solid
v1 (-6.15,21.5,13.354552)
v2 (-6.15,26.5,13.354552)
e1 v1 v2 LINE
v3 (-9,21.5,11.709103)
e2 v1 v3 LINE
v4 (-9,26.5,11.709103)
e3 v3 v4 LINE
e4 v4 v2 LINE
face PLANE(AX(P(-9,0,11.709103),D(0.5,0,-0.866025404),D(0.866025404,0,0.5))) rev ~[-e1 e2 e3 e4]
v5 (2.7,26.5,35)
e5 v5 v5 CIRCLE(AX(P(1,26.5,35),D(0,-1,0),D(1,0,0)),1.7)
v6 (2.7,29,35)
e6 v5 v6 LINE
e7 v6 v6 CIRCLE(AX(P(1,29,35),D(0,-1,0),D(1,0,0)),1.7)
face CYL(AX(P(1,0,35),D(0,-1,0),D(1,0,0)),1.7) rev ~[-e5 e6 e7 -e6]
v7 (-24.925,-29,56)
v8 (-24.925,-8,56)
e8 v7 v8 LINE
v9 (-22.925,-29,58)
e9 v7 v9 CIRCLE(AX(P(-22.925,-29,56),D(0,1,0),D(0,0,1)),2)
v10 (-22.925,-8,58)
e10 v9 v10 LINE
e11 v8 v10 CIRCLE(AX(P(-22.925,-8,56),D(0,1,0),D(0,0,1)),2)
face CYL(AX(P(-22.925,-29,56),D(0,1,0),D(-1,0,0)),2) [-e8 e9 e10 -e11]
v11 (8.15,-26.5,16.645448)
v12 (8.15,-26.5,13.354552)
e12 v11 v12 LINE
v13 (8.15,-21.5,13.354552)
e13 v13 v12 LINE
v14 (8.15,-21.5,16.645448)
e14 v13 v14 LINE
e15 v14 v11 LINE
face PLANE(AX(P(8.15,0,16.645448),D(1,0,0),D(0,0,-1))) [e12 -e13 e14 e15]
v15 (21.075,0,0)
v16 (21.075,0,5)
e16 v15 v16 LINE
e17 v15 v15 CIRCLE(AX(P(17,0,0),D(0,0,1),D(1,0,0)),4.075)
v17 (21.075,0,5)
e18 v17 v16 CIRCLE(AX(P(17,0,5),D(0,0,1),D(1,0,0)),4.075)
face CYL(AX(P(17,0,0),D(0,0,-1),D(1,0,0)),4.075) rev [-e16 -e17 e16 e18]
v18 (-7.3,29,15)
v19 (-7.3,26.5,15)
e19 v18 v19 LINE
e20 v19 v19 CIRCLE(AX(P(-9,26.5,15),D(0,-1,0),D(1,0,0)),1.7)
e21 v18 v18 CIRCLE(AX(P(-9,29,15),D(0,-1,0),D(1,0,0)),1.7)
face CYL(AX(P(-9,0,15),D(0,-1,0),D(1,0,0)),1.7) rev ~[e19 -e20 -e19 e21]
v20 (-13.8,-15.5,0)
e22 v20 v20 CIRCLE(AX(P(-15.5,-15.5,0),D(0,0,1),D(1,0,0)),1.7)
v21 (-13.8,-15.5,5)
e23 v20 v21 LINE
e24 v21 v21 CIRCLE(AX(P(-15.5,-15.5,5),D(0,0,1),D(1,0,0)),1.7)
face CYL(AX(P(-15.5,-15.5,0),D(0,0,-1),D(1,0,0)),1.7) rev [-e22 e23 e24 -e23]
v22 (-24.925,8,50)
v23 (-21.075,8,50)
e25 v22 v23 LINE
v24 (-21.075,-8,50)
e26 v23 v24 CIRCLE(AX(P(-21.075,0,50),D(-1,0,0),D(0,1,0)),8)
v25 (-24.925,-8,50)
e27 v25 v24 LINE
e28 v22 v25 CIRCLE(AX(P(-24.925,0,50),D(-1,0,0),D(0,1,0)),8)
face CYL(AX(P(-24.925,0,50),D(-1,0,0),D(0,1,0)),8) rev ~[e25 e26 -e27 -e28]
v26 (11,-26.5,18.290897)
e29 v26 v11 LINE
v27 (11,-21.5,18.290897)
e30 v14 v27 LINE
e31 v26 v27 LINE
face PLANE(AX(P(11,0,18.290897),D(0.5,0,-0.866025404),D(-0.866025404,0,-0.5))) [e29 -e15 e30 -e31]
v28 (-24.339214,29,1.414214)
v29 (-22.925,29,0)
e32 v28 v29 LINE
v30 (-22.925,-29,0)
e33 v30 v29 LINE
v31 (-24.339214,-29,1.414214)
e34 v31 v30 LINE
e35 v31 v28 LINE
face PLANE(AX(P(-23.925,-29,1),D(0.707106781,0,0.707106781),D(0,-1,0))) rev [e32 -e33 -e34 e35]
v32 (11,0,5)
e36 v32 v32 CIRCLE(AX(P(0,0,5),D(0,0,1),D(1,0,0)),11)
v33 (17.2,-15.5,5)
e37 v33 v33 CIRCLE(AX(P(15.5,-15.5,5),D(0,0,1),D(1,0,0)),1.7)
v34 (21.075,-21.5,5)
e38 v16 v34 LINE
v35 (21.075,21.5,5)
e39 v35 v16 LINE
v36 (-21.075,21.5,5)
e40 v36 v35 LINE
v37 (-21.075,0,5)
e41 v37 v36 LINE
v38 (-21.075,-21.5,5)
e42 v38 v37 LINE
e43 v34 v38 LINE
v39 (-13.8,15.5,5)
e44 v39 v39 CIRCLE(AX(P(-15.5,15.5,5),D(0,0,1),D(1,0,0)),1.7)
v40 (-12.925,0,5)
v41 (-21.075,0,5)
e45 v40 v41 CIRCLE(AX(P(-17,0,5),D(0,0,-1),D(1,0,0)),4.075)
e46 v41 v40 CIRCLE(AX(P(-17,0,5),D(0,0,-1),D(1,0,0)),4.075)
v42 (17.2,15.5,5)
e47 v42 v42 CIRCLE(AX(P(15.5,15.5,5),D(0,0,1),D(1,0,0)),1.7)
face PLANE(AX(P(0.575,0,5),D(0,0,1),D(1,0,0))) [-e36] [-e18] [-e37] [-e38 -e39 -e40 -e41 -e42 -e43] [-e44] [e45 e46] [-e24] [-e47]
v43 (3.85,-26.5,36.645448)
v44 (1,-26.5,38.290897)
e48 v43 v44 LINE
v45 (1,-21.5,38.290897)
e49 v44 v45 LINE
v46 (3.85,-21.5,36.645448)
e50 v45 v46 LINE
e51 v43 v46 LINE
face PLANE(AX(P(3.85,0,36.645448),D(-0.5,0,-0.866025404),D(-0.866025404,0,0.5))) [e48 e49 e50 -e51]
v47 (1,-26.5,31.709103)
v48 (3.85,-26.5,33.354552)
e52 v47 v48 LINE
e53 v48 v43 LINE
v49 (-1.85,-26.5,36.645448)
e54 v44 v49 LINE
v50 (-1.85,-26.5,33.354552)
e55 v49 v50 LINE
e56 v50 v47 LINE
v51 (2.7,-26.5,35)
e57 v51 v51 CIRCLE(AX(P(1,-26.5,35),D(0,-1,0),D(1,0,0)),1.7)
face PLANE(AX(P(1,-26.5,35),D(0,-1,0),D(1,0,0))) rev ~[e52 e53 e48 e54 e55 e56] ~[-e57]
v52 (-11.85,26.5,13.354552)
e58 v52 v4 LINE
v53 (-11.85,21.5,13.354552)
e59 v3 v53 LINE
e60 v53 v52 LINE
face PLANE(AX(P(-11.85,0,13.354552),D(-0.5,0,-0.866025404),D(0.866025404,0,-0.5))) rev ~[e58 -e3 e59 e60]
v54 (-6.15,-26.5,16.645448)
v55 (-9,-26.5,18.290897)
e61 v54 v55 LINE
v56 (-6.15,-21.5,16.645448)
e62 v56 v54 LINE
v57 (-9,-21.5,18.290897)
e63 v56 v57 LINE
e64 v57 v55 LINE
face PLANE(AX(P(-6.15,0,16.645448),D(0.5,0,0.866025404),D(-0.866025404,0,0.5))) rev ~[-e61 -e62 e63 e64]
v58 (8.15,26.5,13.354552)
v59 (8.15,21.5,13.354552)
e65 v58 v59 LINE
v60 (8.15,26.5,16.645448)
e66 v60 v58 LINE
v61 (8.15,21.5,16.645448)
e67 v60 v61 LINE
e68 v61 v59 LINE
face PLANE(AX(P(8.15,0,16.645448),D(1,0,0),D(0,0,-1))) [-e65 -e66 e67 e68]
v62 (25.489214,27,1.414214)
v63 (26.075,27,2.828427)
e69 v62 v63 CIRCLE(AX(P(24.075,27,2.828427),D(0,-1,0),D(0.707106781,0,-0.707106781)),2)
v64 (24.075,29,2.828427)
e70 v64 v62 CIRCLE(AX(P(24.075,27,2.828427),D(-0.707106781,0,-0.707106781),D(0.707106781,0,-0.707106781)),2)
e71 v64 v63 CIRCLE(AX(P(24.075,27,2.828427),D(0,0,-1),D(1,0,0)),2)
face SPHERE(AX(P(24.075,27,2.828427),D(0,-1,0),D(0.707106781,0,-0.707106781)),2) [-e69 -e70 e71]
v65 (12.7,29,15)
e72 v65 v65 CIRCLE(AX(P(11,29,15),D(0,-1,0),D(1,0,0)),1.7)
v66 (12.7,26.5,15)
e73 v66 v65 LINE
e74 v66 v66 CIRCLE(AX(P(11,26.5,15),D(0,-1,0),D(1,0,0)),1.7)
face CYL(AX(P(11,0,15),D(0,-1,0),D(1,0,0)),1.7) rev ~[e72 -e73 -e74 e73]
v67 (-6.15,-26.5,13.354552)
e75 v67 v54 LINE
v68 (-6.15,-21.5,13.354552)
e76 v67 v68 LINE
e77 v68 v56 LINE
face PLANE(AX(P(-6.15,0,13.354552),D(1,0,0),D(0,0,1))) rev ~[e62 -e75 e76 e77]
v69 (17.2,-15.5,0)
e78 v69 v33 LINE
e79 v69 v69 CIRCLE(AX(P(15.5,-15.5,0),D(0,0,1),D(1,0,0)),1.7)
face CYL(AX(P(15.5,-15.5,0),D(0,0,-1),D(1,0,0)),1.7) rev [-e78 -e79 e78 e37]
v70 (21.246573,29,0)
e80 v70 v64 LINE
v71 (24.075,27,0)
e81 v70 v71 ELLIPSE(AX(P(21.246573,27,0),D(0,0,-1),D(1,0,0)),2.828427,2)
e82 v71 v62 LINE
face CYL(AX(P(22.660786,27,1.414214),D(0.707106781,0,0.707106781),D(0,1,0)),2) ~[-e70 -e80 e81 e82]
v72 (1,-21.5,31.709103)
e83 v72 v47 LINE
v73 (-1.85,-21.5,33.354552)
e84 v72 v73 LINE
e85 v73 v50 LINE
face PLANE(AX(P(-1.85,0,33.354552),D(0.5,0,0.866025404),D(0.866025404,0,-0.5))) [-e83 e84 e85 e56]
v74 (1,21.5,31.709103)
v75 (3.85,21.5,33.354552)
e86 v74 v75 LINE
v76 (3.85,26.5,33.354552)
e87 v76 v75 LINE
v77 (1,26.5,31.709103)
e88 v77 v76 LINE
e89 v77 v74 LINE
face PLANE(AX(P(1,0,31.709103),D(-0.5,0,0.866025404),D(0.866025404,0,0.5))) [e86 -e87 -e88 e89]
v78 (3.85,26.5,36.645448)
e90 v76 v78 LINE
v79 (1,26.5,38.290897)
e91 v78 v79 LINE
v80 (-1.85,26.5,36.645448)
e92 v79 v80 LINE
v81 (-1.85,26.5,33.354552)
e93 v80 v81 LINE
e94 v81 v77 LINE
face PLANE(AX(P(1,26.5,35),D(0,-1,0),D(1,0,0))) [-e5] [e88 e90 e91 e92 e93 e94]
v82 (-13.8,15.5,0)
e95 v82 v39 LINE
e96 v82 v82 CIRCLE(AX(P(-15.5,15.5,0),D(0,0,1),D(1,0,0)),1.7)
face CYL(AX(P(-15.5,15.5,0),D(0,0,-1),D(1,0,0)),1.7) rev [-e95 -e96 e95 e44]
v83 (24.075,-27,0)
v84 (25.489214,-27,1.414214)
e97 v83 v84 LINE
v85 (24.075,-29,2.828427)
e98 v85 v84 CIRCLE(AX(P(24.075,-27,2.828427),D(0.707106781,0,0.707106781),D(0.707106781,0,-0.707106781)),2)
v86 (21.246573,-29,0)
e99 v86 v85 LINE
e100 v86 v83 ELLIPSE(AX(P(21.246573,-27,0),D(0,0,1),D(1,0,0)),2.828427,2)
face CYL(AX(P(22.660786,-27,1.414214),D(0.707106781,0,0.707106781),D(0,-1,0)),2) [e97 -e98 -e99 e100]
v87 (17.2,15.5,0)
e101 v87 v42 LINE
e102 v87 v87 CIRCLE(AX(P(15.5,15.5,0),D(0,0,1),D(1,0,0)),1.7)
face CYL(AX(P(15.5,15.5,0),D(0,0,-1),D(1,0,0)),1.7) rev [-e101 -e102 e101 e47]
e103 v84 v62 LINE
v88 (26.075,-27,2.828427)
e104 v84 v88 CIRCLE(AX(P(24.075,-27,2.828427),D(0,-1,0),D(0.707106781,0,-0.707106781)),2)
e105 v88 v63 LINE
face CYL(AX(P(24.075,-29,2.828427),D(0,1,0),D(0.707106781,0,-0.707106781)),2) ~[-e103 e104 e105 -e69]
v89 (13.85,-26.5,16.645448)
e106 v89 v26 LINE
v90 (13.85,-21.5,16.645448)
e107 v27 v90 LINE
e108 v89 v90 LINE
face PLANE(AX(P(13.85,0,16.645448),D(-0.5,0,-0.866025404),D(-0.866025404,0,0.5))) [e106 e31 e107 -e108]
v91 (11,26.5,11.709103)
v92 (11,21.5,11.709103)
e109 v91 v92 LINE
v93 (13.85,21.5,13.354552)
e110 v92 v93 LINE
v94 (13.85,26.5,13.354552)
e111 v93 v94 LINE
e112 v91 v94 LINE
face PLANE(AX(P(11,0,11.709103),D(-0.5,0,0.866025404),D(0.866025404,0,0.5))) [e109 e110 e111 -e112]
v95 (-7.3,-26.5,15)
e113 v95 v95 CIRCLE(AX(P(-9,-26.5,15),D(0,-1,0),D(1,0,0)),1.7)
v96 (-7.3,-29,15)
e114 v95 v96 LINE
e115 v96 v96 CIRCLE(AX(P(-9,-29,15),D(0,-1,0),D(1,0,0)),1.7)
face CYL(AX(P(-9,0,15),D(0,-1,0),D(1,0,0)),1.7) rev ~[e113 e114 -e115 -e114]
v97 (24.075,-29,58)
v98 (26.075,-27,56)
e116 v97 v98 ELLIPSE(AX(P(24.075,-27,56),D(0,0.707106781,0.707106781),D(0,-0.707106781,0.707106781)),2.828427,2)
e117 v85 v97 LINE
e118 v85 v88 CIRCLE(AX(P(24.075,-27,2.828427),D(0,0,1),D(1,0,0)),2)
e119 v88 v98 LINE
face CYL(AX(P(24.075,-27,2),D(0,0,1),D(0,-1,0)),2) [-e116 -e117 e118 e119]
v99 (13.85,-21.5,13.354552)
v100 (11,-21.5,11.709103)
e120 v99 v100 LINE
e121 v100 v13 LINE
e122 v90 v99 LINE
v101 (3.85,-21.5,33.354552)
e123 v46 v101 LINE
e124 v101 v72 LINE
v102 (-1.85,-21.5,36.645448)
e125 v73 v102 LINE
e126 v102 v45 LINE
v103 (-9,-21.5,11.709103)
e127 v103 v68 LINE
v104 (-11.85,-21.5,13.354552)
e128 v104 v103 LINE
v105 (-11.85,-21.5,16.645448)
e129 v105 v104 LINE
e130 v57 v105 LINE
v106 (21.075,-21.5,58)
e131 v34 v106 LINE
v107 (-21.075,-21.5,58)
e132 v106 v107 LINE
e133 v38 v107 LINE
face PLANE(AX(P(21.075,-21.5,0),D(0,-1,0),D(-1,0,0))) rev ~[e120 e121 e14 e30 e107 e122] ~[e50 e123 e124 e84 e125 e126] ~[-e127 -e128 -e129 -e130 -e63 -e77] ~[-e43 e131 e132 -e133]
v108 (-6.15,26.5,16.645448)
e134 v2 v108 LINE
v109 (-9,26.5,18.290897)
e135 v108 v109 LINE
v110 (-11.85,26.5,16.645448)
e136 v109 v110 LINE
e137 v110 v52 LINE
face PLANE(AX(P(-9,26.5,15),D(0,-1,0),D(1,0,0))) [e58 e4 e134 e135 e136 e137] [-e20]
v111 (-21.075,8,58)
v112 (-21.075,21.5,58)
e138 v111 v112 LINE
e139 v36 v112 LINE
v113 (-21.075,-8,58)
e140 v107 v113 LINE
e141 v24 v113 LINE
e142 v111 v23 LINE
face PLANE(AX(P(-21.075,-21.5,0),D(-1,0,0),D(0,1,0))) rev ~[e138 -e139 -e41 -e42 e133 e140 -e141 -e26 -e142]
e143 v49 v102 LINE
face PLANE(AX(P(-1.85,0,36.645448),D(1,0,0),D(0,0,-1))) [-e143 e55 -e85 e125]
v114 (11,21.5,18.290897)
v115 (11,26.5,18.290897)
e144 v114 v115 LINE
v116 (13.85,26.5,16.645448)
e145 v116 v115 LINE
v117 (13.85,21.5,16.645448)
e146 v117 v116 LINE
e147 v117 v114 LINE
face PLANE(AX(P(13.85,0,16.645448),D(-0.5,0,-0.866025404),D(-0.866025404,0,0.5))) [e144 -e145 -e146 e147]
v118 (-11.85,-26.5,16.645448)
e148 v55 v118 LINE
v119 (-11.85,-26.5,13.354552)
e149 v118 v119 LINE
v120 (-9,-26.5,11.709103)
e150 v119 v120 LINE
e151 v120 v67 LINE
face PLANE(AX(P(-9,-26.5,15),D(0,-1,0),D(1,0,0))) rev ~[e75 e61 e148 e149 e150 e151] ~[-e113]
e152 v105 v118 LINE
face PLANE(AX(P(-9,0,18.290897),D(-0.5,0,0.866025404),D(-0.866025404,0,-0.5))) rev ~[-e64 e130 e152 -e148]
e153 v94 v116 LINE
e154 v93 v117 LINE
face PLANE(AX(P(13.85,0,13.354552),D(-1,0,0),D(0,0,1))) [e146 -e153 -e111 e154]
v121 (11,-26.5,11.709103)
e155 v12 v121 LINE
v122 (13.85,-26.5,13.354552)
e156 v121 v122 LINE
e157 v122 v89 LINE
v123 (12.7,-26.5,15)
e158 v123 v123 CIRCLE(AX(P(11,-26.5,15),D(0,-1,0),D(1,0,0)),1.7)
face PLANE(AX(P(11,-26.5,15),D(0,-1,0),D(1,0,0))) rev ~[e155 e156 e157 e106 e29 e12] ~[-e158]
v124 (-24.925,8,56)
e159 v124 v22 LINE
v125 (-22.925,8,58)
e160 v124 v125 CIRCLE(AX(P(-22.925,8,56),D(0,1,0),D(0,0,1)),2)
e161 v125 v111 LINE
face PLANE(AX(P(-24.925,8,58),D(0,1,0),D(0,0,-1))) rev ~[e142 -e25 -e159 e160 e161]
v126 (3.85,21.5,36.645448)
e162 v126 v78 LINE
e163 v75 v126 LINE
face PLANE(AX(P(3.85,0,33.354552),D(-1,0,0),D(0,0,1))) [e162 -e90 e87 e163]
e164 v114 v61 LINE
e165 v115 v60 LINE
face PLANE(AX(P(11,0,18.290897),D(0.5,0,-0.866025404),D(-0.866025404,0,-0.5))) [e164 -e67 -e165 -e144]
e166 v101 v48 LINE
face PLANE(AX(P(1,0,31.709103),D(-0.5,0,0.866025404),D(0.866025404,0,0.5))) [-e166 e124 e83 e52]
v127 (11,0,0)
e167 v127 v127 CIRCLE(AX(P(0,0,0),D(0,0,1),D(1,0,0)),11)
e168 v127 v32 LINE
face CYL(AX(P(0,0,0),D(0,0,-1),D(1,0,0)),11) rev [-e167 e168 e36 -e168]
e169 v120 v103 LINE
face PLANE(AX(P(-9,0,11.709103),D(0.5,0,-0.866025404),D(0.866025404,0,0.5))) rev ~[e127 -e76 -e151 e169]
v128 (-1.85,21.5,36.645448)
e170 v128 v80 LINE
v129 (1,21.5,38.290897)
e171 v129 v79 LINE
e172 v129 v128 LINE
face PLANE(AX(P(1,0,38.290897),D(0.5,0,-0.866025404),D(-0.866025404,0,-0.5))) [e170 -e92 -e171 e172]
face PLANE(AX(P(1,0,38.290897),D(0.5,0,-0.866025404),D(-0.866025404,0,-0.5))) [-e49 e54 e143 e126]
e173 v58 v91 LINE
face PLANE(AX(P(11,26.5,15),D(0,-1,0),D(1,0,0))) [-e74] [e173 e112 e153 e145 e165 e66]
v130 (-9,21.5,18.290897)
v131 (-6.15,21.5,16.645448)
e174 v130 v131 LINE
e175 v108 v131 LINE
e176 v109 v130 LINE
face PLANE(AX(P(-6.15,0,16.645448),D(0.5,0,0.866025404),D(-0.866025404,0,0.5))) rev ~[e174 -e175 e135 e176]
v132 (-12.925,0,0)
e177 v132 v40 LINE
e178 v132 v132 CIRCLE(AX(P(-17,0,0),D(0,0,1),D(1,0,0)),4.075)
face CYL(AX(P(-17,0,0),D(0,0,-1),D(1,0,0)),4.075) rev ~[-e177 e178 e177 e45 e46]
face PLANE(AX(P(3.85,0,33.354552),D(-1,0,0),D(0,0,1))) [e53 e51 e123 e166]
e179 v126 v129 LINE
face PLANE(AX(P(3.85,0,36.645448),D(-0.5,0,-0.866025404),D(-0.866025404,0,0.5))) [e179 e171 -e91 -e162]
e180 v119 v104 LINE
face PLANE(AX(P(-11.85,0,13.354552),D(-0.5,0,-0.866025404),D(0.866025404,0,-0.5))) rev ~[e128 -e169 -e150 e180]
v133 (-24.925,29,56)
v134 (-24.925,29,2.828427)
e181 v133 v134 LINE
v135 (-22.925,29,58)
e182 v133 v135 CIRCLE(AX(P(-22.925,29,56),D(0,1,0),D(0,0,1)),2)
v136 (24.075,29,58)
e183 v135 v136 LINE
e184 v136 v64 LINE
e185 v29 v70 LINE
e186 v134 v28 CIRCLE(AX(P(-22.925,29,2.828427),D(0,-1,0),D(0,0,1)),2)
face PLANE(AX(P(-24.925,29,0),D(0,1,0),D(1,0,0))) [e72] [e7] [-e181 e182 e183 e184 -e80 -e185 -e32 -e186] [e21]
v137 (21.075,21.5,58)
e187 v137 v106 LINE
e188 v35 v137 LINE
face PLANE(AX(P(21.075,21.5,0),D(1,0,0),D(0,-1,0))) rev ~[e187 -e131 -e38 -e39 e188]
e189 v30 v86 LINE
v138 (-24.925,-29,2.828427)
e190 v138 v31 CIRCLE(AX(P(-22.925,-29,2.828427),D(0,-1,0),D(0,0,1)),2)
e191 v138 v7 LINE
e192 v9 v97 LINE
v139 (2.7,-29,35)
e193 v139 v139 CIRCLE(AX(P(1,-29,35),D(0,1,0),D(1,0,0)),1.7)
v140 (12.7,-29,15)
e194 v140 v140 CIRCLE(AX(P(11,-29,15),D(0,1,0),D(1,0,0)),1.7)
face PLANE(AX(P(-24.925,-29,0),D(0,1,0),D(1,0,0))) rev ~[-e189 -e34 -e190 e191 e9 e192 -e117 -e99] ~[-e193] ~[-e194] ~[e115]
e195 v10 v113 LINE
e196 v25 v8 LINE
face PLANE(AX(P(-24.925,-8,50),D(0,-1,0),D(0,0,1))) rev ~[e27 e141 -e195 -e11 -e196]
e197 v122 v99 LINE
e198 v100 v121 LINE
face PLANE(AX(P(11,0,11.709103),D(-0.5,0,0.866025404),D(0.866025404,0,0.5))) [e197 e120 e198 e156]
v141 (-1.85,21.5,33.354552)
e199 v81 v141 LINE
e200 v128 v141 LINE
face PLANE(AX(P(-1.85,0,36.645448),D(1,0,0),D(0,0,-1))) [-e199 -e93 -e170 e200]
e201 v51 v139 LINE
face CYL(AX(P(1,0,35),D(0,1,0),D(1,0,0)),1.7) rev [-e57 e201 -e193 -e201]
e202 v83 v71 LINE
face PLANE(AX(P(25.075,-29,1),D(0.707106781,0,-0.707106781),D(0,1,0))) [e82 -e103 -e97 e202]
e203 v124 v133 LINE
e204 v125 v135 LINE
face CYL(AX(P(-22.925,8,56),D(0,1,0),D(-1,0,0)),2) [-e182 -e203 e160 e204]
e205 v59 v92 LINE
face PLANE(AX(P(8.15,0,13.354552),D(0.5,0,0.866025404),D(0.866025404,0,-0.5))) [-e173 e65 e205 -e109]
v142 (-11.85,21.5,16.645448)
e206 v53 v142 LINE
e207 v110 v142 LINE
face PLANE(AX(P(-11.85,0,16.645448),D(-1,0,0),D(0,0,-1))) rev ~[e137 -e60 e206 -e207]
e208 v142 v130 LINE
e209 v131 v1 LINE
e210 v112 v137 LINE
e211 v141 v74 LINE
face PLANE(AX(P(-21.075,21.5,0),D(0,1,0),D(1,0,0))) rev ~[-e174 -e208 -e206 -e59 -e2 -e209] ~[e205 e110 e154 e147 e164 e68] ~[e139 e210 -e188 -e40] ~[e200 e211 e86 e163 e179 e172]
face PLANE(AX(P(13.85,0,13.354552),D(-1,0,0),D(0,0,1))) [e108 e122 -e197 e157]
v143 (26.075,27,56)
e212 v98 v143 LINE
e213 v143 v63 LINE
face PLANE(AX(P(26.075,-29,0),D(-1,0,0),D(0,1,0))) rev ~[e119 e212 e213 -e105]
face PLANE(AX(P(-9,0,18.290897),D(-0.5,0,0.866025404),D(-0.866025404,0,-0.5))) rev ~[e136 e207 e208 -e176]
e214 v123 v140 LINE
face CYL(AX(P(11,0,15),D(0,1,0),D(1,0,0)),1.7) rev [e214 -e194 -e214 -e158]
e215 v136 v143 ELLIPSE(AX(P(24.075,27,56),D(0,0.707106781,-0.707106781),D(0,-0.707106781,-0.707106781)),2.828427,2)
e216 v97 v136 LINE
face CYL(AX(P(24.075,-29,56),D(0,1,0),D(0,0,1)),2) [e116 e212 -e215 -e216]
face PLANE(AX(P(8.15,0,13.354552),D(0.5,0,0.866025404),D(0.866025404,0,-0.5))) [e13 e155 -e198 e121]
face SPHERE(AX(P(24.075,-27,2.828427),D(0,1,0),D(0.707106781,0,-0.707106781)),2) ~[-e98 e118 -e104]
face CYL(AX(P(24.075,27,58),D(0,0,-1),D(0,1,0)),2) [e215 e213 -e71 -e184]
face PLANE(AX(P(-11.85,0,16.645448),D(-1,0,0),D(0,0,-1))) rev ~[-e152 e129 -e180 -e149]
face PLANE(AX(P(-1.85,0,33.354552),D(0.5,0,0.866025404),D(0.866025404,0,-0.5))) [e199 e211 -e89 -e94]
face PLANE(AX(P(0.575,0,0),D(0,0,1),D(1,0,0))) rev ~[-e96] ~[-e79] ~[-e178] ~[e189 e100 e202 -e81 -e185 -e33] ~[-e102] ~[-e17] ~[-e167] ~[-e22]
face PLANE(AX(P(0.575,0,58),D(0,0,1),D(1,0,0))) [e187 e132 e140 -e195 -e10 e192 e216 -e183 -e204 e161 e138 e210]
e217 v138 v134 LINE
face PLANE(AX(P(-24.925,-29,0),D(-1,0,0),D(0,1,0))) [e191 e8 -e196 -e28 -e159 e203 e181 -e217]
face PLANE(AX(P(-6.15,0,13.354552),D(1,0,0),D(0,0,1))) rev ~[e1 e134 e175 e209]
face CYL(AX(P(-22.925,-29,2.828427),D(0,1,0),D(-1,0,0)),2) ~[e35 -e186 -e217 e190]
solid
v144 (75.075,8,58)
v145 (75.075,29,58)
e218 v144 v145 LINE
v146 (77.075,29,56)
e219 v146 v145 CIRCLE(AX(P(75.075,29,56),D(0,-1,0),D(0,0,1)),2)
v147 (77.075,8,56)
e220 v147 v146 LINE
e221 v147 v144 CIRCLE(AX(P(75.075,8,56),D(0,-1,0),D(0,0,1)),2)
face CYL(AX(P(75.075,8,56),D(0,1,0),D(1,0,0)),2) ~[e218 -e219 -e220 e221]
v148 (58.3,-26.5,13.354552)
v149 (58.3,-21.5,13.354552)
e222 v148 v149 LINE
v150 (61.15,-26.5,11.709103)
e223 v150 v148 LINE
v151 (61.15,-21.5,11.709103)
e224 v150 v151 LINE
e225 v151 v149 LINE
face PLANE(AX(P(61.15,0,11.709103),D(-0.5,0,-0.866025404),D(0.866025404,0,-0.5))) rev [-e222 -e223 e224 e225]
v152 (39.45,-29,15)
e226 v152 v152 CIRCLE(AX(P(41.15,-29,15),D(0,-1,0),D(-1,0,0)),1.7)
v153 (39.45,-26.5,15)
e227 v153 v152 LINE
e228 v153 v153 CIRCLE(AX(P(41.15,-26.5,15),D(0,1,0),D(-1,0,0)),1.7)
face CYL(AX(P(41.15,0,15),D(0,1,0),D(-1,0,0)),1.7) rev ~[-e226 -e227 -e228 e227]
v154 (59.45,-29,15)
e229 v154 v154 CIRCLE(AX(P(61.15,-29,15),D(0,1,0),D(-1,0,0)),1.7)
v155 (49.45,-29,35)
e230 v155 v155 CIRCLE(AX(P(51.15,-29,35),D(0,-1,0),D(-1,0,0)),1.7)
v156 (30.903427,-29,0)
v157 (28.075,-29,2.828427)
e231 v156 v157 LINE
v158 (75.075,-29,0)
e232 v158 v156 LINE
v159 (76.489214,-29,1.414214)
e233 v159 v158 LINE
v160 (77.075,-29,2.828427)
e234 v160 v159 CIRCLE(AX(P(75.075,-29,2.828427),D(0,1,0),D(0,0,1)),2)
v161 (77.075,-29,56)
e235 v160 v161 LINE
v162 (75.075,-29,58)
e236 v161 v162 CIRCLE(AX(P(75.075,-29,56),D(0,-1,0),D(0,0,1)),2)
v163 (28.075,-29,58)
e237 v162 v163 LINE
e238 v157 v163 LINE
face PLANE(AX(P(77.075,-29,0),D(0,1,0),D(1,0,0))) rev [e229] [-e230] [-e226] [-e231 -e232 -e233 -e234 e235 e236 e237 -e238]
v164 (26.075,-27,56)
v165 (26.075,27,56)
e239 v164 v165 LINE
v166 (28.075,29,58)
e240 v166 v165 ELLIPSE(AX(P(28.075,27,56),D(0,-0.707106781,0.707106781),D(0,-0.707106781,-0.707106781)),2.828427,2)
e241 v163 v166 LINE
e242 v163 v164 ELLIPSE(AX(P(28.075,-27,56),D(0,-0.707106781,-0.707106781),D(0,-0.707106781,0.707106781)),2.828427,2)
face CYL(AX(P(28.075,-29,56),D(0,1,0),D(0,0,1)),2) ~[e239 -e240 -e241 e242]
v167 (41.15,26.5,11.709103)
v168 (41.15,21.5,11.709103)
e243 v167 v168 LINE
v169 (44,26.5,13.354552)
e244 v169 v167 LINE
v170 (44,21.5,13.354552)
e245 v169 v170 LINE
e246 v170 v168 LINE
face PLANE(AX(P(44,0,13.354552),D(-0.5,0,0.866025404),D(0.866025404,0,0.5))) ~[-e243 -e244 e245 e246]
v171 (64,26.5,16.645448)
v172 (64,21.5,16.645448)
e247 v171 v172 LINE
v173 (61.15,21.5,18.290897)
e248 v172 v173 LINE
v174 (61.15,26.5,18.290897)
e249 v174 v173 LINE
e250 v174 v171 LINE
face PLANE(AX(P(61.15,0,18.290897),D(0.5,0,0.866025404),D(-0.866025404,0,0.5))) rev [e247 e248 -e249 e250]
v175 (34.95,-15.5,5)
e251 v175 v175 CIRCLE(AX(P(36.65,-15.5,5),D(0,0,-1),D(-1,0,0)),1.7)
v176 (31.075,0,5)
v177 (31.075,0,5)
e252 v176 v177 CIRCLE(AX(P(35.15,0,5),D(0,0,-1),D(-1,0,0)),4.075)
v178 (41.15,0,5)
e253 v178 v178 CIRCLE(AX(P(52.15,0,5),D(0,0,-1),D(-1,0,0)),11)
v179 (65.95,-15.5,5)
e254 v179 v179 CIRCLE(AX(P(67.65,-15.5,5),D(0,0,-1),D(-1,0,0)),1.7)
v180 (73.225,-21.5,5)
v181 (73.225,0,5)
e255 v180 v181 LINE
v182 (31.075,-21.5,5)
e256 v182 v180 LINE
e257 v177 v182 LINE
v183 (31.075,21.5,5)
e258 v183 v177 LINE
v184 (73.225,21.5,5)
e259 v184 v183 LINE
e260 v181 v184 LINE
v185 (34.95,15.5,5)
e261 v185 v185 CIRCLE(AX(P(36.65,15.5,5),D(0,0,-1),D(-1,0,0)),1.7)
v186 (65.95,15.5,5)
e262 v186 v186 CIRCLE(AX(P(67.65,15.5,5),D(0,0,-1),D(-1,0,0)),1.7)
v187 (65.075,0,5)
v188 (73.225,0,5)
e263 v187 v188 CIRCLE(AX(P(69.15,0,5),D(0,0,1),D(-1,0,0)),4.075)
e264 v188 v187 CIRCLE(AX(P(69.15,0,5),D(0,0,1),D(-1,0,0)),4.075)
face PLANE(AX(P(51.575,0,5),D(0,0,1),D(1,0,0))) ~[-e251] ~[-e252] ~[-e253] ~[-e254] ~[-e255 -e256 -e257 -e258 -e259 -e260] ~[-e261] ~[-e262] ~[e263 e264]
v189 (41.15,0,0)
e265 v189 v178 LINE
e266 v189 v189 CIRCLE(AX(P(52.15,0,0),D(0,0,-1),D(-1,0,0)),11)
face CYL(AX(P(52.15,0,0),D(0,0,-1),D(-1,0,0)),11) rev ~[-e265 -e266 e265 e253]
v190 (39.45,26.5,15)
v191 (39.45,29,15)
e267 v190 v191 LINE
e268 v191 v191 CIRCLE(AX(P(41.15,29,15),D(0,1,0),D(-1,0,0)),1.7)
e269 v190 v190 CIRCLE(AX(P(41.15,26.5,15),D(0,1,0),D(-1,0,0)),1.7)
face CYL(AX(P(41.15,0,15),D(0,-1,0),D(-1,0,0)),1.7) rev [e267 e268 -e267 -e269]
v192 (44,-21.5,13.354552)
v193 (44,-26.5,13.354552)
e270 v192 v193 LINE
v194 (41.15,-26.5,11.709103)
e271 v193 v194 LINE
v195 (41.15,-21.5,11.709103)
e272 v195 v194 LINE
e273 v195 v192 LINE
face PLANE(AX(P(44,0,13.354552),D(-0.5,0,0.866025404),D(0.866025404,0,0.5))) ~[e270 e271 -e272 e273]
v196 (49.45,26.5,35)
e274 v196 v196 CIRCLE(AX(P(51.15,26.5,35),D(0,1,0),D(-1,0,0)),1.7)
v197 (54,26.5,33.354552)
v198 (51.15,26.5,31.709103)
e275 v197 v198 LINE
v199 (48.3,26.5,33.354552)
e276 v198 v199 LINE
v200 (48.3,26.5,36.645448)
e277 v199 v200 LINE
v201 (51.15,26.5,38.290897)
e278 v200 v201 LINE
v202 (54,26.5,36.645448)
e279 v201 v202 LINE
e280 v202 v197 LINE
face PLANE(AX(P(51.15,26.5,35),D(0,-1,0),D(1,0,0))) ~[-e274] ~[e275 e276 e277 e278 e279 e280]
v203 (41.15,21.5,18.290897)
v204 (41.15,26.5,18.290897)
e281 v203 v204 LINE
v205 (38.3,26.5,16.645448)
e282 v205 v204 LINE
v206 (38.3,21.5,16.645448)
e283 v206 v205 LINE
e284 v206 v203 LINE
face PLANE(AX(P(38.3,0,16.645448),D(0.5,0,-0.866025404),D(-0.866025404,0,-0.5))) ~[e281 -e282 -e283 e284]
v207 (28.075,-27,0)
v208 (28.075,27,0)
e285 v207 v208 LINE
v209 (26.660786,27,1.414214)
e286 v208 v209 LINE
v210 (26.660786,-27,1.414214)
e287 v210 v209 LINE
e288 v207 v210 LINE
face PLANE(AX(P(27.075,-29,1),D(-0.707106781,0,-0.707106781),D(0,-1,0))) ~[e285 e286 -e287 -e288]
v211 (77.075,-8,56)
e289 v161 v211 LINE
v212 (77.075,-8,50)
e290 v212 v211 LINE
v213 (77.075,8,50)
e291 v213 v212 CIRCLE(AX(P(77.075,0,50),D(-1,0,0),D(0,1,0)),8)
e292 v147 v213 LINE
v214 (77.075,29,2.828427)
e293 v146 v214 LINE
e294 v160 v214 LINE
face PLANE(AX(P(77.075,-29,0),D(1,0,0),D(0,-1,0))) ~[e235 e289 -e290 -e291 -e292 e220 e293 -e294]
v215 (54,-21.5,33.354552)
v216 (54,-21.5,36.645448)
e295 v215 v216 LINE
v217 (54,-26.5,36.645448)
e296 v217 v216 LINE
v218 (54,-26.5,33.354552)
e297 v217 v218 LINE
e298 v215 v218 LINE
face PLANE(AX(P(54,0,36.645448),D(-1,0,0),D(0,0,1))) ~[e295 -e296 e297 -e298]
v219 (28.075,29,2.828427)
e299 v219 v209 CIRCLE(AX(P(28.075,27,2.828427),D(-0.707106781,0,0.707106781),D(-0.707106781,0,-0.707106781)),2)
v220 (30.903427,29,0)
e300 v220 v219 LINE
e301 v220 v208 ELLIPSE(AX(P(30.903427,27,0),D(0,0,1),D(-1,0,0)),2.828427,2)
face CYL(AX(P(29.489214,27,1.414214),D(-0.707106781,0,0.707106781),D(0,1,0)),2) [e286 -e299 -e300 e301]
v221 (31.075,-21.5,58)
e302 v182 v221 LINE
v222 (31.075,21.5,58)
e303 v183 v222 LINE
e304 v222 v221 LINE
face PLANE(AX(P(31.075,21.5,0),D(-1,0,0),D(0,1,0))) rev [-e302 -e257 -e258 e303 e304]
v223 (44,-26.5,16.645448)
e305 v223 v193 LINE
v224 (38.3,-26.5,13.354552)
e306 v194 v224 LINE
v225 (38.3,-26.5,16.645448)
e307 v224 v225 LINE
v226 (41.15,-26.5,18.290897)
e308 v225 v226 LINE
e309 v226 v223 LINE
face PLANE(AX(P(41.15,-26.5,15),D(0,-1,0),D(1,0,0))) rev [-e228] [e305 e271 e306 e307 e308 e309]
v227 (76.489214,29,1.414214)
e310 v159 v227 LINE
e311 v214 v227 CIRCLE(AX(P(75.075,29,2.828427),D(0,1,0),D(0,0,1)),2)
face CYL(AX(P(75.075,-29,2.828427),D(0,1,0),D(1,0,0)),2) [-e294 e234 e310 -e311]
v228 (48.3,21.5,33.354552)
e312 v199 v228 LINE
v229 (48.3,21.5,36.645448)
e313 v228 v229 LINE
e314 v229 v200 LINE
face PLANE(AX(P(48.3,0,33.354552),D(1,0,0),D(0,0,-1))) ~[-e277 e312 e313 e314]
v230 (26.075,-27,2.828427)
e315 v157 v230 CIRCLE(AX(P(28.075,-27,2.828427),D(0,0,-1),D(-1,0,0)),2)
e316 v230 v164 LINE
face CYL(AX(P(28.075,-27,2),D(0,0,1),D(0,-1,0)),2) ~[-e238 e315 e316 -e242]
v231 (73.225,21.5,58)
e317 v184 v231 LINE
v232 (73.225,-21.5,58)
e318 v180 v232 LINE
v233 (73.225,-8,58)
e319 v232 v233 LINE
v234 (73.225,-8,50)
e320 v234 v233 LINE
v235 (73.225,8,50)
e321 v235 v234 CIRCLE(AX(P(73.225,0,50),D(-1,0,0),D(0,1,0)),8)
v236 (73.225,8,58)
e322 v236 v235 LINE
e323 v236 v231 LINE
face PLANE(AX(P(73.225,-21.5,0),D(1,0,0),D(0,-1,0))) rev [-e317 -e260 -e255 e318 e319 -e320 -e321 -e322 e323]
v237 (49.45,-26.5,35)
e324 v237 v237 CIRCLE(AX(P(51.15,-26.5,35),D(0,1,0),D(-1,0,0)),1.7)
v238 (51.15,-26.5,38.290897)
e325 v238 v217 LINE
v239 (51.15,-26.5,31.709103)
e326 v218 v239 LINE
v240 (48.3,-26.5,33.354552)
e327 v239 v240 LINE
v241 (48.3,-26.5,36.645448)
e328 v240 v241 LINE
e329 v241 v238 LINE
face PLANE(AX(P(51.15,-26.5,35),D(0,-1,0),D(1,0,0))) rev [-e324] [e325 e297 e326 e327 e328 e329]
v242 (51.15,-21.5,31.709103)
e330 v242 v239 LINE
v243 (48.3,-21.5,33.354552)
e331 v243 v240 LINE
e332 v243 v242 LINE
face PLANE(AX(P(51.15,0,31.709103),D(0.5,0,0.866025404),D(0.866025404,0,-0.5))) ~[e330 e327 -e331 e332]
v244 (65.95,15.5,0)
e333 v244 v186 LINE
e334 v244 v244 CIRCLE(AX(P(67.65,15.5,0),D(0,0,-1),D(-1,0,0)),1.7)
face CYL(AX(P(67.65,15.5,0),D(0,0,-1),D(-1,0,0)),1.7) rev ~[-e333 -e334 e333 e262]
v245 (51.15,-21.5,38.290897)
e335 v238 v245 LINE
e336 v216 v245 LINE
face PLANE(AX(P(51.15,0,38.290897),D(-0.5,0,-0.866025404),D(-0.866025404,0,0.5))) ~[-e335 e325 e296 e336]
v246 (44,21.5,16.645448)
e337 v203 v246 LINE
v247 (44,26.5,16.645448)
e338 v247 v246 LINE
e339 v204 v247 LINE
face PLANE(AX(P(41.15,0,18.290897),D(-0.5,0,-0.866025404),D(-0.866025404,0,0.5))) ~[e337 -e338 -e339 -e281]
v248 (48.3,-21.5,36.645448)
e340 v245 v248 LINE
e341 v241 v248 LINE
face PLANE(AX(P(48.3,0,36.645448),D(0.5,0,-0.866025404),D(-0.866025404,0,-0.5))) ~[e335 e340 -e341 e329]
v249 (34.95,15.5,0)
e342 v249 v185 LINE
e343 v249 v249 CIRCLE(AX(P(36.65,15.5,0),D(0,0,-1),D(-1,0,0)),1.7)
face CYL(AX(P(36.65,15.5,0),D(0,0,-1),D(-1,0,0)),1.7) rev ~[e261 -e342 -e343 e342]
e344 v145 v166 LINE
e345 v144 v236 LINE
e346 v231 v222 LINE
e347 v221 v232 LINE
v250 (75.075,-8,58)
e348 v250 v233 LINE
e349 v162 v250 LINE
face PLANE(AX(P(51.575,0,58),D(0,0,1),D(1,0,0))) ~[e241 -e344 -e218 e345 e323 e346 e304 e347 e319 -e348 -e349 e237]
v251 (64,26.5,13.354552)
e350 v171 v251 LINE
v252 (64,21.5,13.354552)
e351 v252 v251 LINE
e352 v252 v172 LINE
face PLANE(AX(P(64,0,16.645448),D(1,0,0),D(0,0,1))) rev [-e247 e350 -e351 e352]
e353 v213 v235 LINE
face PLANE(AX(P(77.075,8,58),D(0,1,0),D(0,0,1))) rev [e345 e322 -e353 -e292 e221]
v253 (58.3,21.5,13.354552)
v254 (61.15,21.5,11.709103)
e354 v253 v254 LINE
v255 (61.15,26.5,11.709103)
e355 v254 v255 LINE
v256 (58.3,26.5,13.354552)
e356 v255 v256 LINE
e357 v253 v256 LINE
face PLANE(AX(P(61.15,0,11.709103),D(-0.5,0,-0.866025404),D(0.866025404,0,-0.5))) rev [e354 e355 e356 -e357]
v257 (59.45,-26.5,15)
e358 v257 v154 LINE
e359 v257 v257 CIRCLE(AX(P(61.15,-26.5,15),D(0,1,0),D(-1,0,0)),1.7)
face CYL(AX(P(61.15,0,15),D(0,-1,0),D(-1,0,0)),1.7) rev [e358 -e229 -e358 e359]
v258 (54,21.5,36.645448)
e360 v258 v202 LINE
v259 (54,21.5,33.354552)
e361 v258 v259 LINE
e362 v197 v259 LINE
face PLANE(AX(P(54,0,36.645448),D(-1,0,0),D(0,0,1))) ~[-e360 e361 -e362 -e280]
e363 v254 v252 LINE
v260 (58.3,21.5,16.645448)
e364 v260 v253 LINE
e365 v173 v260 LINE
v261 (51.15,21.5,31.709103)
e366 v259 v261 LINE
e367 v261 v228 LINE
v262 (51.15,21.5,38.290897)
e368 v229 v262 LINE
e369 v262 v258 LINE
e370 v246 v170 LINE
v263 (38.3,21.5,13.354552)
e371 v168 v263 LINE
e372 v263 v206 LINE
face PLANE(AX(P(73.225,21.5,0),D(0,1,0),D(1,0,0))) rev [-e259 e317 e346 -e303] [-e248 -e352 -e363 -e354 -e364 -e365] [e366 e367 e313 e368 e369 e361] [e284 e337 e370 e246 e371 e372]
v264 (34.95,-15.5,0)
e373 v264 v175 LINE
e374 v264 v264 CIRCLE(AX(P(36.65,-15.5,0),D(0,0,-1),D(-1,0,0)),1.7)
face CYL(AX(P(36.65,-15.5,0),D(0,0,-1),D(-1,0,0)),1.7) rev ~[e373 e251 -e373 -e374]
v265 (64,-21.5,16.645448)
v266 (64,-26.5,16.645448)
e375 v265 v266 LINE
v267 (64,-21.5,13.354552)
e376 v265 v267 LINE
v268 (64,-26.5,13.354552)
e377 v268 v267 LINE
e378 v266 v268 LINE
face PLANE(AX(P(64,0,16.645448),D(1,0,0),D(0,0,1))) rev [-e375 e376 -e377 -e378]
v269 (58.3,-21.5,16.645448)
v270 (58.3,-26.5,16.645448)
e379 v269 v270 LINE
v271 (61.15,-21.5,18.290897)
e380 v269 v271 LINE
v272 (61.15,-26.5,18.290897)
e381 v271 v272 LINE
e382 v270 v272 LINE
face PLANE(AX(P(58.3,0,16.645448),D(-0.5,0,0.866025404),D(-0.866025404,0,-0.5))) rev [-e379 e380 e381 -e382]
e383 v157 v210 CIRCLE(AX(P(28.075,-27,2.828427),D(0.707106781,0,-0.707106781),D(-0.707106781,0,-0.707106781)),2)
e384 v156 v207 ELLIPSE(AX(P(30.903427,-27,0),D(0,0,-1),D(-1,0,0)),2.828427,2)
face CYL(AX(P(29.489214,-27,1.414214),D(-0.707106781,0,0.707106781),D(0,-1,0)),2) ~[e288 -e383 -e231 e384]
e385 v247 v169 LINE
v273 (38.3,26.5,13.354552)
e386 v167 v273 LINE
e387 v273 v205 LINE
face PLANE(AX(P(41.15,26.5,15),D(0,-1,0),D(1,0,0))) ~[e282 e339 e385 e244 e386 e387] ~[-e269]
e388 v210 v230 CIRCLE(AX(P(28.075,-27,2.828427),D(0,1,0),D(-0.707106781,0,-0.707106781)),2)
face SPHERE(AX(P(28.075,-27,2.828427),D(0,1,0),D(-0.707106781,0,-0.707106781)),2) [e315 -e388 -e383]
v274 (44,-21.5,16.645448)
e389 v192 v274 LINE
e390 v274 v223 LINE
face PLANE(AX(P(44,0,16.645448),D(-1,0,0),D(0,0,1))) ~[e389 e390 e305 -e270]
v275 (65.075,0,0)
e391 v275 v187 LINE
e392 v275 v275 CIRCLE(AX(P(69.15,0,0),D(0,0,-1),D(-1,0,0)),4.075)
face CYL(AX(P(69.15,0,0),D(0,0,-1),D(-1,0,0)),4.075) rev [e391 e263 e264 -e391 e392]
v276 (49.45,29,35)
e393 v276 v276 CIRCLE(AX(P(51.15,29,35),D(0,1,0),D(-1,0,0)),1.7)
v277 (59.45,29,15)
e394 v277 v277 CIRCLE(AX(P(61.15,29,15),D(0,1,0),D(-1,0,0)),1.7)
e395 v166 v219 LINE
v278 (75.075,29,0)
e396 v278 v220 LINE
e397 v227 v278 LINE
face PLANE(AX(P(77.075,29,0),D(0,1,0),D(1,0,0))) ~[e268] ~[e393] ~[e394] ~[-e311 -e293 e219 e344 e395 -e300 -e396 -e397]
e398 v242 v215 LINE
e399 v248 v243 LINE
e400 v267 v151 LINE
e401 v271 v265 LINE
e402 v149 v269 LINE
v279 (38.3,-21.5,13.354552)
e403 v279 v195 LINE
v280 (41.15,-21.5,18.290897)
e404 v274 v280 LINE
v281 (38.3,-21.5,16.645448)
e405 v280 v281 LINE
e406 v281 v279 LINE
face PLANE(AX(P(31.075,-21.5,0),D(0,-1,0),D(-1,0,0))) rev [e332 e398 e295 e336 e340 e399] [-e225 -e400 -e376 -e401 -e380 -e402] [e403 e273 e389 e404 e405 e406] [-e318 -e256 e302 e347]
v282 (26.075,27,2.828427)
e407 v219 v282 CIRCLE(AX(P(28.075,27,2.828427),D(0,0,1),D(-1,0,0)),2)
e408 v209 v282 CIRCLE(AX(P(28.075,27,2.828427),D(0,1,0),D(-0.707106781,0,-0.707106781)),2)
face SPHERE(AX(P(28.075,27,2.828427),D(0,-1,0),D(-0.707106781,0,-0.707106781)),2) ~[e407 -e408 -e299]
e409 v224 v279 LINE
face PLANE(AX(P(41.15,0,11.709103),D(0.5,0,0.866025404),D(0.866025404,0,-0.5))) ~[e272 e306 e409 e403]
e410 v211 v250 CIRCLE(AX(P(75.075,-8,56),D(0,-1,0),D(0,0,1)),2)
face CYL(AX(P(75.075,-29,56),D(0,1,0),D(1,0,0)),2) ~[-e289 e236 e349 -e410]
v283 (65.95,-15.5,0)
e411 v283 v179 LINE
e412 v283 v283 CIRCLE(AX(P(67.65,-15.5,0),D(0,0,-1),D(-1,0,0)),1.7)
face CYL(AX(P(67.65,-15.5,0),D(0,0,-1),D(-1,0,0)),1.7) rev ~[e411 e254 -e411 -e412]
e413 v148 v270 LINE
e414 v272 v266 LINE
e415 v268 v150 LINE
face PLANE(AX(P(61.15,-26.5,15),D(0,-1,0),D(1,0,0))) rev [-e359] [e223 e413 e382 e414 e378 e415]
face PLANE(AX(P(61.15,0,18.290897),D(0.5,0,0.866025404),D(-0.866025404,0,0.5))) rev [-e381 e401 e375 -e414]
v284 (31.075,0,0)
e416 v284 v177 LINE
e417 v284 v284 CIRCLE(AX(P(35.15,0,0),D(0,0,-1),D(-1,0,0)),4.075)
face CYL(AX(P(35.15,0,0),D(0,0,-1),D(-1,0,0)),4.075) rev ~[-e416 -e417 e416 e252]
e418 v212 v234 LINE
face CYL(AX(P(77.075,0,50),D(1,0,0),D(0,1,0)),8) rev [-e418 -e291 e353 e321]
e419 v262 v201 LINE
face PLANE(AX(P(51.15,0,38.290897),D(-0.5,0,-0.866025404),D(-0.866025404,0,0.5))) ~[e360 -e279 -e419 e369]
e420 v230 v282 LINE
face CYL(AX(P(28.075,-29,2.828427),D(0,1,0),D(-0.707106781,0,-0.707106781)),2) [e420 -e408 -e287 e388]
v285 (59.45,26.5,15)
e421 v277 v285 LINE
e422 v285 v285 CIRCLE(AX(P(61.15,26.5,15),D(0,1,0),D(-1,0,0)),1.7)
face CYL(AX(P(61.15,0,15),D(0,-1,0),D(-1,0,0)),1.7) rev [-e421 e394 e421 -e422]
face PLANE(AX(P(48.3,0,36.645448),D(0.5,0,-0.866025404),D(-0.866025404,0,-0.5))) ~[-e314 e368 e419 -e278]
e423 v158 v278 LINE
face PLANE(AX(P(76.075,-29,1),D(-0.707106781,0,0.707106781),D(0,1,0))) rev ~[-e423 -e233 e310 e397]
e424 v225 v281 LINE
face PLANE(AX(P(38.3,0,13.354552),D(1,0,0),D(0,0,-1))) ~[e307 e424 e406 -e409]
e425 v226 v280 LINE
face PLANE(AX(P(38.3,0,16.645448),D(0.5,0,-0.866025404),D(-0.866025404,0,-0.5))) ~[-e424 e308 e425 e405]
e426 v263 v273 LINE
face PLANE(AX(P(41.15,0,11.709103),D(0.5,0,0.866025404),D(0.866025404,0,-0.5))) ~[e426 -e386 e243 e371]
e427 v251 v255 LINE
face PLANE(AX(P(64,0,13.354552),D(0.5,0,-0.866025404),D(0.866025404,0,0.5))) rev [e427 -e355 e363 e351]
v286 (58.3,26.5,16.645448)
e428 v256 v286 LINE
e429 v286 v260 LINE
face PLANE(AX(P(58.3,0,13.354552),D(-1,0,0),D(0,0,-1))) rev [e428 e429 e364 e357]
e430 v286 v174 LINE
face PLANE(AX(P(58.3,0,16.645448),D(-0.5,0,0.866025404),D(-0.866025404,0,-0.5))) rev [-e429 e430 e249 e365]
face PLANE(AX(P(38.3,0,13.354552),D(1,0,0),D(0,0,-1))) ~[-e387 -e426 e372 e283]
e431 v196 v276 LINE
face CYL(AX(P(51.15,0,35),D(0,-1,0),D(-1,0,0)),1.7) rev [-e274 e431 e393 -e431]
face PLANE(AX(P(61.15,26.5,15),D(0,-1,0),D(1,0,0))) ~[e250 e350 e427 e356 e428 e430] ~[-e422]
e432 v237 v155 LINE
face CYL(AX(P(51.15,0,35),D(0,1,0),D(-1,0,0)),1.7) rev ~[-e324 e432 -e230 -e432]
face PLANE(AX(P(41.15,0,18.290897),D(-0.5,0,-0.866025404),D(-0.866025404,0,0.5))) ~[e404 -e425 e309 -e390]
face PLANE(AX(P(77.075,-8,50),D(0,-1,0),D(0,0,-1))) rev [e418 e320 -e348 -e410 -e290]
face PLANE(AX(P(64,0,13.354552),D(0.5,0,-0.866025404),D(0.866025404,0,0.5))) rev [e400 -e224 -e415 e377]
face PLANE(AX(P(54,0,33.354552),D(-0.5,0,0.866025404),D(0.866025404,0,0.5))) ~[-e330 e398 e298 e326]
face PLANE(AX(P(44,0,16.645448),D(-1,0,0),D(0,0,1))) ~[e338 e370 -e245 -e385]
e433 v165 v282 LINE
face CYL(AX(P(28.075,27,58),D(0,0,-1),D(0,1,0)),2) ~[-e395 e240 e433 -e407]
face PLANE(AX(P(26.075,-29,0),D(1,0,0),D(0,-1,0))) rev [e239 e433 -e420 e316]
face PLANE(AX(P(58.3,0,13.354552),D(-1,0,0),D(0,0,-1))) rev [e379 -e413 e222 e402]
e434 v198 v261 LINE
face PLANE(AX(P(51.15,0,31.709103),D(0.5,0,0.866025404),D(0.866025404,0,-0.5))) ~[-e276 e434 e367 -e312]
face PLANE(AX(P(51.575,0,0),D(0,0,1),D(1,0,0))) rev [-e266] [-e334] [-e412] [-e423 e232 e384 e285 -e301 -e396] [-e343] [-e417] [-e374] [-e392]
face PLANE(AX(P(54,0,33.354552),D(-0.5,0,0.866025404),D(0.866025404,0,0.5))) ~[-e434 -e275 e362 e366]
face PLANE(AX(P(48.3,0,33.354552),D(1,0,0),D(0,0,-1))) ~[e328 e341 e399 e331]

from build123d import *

# Parameters (mm, degrees)
F0_W     = 51
F0_H     = 58
F1_DEPTH = 58
F0_R     = 1.7
F0_R_2   = 11
F0_R_3   = 4.075
F2_DEPTH = 5
F3_R     = 1.7
F4_DEPTH = 99.5
F5_DEPTH = 26.5
F7_DEPTH = 3.85
F8_SIZE  = 2
F9_R     = 2


# Not quite as in the source:
# - two fillets or chamfers of one size are made in one step


with BuildPart() as f1:
    # F0 (on Top) → F1 (new body)
    with BuildSketch(Plane.XY):
        with Locations((0.575, 0)):
            Rectangle(F0_W, F0_H)
        Polygon((-21.075, -21.5), (-21.075, 0), (-21.075, 21.5), (21.075, 21.5), (21.075, 0), (21.075, -21.5), align=None, mode=Mode.SUBTRACT)
    extrude(amount=F1_DEPTH)

    # F0 (on Top) → F2 (join)
    with BuildSketch(Plane.XY):
        with Locations((0.575, 0)):
            Rectangle(F0_W, F0_H)
        Polygon((-21.075, -21.5), (-21.075, 0), (-21.075, 21.5), (21.075, 21.5), (21.075, 0), (21.075, -21.5), align=None, mode=Mode.SUBTRACT)
        Polygon((-21.075, 21.5), (-21.075, 0), (-21.075, -21.5), (21.075, -21.5), (21.075, 0), (21.075, 21.5), align=None)
        with Locations((-15.5, -15.5)):
            Circle(F0_R, mode=Mode.SUBTRACT)
        with Locations((15.5, -15.5)):
            Circle(F0_R, mode=Mode.SUBTRACT)
        with BuildLine():
            ThreePointArc((-21.075, 0), (-17, 4.075), (-12.925, 0))
            ThreePointArc((-12.925, 0), (-17, -4.075), (-21.075, 0))
        make_face(mode=Mode.SUBTRACT)
        Circle(F0_R_2, mode=Mode.SUBTRACT)
        with Locations((-15.5, 15.5)):
            Circle(F0_R, mode=Mode.SUBTRACT)
        with Locations((17, 0)):
            Circle(F0_R_3, mode=Mode.SUBTRACT)
        with Locations((15.5, 15.5)):
            Circle(F0_R, mode=Mode.SUBTRACT)
    extrude(amount=F2_DEPTH)

    # F3 (on Front) → F4 (cut, symmetric)
    with BuildSketch(Plane.XZ):
        with Locations((1, 35)):
            Circle(F3_R)
        with Locations((11, 15)):
            Circle(F3_R)
        with Locations((-9, 15)):
            Circle(F3_R)
    extrude(amount=F4_DEPTH, both=True, mode=Mode.SUBTRACT)

    # F3 (on Front) → F5 (cut, symmetric)
    with BuildSketch(Plane.XZ):
        Polygon((-1.85, 36.6454482672), (-1.85, 33.3545517328), (1, 31.7091034656), (3.85, 33.3545517328), (3.85, 36.6454482672), (1, 38.2908965344), align=None)
        with Locations((1, 35)):
            Circle(F3_R, mode=Mode.SUBTRACT)
        Polygon((11, 18.2908965344), (8.15, 16.6454482672), (8.15, 13.3545517328), (11, 11.7091034656), (13.85, 13.3545517328), (13.85, 16.6454482672), align=None)
        with Locations((11, 15)):
            Circle(F3_R, mode=Mode.SUBTRACT)
        Polygon((-6.15, 13.3545517328), (-6.15, 16.6454482672), (-9, 18.2908965344), (-11.85, 16.6454482672), (-11.85, 13.3545517328), (-9, 11.7091034656), align=None)
        with Locations((-9, 15)):
            Circle(F3_R, mode=Mode.SUBTRACT)
    extrude(amount=F5_DEPTH, both=True, mode=Mode.SUBTRACT)

    # F6 (on face) → F7 (cut, through all)
    with BuildSketch(Plane(origin=(-24.925, 0, 0), x_dir=(0, -1, 0), z_dir=(-1, 0, 0))):
        with BuildLine():
            Line((8, 50), (8, 58))
            Line((8, 58), (-8, 58))
            Line((-8, 58), (-8, 50))
            ThreePointArc((-8, 50), (0, 42), (8, 50))
        make_face()
    extrude(amount=-F7_DEPTH, mode=Mode.SUBTRACT)

    # F8
    f8_edges = [f1.edges().sort_by_distance(p)[0] for p in [
        (-24.925, 0, 0),
        (26.075, 0, 0),
    ]]
    chamfer(f8_edges, length=F8_SIZE)

    # F9
    f9_edges = [f1.edges().sort_by_distance(p)[0] for p in [
        (26.075, 0, 2),
        (-24.925, 0, 2),
        (25.075, 29, 1),
        (26.075, 29, 30),
        (25.075, -29, 1),
        (26.075, -29, 30),
        (26.075, 0, 58),
        (-24.925, -18.5, 58),
        (-24.925, 18.5, 58),
    ]]
    fillet(f9_edges, radius=F9_R)


with BuildPart() as f11_1:
    # F11: instance of F1
    add(f1.part.mirror(Plane(origin=(26.075, 0, 29.4142135624), x_dir=(0, 1, 0), z_dir=(1, 0, 0))))


solid = Compound([f1.part, f11_1.part])
